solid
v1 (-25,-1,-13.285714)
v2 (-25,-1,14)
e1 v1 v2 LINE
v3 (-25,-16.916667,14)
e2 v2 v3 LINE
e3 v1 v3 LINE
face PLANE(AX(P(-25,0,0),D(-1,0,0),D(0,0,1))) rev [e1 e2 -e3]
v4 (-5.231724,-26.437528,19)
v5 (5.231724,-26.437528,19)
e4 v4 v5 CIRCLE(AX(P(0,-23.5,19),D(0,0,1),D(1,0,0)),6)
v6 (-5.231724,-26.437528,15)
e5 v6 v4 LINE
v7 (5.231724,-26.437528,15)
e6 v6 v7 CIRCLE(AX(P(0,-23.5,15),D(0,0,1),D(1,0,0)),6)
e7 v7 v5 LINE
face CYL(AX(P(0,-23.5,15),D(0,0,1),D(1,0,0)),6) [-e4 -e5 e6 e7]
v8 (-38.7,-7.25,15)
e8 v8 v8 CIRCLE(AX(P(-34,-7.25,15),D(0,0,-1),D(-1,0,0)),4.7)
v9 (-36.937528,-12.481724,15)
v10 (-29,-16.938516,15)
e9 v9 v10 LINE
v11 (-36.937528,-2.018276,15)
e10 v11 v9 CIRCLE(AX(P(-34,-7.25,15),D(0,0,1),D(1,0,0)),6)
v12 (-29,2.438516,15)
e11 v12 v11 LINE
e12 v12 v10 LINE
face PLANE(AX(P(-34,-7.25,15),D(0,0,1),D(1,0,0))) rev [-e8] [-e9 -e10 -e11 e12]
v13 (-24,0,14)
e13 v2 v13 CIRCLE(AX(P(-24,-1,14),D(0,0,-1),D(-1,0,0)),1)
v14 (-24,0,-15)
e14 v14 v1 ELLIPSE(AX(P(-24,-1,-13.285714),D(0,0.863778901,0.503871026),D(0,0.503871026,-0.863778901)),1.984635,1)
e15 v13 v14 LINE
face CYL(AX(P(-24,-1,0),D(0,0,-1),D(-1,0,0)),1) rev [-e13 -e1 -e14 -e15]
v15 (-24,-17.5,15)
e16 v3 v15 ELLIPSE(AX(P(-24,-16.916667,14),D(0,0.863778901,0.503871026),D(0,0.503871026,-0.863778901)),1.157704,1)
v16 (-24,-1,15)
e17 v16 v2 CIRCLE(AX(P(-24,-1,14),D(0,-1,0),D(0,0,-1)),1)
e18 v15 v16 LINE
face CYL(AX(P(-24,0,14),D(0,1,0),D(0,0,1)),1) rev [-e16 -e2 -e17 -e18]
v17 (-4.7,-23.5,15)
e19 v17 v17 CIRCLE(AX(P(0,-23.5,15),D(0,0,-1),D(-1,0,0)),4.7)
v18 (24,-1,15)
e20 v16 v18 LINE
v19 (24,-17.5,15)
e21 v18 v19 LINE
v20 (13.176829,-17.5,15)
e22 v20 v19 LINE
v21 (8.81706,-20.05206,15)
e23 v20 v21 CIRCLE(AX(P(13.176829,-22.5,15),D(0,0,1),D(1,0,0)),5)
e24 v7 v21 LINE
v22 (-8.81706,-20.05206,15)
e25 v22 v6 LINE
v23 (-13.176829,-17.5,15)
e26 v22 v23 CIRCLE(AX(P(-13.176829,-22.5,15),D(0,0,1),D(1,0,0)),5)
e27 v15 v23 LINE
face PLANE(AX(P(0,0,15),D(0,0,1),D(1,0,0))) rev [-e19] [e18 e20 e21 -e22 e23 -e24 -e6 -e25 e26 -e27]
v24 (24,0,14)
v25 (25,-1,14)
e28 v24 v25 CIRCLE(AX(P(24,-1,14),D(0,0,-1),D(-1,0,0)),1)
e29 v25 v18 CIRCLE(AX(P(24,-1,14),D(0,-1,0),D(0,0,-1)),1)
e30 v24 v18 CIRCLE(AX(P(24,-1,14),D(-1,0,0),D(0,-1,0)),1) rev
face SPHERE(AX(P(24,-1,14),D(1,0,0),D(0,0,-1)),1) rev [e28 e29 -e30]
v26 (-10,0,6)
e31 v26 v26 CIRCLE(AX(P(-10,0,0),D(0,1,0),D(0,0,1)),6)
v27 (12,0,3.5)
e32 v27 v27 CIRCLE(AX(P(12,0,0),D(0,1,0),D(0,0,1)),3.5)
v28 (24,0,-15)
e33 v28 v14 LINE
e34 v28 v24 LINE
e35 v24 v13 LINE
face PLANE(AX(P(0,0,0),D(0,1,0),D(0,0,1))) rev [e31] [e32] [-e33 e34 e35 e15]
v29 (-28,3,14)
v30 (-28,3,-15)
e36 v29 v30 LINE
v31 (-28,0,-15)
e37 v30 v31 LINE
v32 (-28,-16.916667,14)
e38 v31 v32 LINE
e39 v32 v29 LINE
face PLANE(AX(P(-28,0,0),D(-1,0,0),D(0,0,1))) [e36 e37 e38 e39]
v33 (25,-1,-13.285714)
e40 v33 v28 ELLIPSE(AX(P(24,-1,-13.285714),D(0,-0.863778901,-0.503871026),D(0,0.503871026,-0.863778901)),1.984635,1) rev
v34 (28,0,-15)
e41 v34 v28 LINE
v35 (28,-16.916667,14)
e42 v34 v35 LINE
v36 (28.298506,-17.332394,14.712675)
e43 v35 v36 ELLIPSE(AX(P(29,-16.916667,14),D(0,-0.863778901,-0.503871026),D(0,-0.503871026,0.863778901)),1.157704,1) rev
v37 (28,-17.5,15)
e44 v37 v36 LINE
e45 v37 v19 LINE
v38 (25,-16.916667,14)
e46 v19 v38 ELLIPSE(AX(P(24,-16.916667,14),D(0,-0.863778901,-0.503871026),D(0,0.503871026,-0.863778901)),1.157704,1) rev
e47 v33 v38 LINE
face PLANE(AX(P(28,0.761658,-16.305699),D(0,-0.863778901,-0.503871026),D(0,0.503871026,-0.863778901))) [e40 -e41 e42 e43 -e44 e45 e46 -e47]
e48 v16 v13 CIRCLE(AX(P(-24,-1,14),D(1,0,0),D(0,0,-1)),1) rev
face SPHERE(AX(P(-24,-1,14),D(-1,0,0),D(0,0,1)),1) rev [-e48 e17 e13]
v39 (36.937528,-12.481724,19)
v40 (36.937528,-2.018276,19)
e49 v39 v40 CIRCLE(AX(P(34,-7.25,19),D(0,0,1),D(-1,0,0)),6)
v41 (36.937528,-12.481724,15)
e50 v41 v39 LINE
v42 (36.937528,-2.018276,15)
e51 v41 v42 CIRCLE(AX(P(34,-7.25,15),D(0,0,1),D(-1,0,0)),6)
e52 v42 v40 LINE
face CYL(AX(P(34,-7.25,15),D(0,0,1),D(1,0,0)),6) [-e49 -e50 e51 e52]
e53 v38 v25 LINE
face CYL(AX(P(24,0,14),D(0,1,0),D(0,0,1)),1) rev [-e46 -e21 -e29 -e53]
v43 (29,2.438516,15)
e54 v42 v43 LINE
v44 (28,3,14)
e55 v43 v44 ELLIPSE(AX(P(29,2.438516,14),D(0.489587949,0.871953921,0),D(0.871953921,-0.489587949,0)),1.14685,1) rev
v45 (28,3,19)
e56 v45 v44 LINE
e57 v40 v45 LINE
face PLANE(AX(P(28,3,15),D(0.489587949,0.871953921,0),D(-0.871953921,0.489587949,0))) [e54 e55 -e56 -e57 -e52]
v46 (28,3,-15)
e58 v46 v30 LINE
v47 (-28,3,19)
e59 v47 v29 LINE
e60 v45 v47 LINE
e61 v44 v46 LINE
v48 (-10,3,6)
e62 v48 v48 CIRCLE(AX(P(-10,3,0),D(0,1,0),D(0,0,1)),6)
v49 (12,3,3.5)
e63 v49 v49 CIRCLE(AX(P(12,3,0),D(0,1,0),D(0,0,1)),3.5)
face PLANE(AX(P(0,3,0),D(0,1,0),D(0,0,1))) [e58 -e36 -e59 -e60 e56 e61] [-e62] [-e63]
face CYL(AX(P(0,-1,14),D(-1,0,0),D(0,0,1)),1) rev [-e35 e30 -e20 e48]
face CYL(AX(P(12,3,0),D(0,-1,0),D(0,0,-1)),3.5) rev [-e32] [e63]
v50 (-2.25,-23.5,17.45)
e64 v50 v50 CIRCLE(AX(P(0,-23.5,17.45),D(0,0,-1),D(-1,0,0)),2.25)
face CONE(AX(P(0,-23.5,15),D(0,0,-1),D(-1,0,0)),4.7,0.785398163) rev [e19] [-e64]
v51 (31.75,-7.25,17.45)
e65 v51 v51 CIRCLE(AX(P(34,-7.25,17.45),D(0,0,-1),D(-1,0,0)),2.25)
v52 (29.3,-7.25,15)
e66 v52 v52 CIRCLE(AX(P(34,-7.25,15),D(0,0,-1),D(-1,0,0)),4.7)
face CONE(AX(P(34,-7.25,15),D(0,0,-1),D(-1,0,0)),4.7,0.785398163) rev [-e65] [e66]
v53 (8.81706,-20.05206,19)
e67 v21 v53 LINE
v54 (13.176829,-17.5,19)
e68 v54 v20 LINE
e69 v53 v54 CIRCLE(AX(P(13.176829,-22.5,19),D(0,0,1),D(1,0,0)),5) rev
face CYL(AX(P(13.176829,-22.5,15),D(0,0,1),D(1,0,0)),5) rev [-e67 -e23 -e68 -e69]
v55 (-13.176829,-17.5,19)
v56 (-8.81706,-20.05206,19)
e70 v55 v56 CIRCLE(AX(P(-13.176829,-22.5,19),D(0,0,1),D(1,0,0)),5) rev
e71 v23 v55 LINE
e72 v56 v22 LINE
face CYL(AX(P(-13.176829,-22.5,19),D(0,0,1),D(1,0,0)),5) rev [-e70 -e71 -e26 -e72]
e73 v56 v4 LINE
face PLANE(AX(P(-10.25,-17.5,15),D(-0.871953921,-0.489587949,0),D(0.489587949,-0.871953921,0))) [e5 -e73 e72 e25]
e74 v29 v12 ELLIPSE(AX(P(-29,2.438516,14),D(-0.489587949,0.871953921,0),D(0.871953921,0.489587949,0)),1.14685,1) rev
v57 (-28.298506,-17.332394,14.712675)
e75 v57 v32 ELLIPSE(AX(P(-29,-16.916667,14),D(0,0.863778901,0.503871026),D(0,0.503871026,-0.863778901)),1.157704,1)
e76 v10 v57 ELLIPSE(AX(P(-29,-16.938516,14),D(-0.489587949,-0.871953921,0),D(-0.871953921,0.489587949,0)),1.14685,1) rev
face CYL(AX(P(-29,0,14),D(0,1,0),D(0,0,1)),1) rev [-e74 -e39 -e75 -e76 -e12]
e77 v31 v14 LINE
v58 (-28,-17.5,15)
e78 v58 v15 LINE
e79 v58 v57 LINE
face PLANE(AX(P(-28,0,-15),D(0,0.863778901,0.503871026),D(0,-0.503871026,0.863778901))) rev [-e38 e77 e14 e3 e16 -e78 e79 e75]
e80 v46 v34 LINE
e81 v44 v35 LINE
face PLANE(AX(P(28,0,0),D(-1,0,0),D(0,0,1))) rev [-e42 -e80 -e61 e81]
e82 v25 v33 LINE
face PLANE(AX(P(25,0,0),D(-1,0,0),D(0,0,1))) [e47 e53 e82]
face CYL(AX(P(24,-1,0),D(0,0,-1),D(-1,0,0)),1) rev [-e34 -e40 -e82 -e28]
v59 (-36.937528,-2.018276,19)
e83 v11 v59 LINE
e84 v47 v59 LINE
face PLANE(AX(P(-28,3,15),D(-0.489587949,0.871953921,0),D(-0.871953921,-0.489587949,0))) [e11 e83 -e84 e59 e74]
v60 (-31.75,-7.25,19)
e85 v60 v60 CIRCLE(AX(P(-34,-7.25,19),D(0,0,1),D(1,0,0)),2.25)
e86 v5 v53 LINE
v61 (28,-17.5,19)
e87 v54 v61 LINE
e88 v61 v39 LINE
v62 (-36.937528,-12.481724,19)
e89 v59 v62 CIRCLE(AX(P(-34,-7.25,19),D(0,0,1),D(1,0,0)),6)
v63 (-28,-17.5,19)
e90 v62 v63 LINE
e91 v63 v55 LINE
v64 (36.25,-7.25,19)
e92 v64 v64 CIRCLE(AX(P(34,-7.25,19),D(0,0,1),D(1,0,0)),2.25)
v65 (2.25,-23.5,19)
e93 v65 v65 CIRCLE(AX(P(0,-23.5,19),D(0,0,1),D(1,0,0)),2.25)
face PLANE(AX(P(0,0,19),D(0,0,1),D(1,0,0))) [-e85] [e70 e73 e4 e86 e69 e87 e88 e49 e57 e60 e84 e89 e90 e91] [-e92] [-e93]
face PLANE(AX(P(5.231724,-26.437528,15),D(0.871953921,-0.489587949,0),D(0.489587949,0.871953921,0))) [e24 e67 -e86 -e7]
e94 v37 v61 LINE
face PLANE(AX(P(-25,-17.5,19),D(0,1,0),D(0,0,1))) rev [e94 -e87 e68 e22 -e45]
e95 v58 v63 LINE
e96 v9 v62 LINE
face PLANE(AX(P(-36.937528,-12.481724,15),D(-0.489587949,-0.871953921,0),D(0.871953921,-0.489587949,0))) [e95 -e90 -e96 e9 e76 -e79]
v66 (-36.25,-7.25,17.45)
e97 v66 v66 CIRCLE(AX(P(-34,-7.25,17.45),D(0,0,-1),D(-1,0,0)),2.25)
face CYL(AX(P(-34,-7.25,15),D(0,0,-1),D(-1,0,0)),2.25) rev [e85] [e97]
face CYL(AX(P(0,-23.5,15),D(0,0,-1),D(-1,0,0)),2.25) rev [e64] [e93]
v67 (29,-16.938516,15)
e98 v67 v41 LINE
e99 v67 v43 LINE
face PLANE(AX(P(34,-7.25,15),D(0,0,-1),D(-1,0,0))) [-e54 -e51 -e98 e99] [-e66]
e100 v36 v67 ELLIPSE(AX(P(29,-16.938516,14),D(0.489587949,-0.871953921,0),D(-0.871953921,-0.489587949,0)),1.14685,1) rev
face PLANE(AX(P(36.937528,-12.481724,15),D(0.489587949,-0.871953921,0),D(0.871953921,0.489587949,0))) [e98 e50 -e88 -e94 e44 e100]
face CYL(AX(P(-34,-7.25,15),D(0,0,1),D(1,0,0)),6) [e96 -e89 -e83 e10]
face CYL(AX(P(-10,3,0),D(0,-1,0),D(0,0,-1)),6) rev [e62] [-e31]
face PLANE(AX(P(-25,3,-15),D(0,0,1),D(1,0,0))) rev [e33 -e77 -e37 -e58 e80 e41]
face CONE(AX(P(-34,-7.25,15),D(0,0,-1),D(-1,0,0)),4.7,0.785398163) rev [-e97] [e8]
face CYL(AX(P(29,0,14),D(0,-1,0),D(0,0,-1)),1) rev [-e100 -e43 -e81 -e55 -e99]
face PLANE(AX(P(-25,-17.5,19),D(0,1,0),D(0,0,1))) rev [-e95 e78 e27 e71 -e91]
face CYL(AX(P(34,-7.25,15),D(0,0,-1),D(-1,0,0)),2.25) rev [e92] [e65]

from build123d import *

# Parameters (mm, degrees)
SKETCH1_W                                       = 50
SKETCH1_H                                       = 30
SKETCH1_R                                       = 6
SKETCH1_R_2                                     = 3.5
BOSS_EXTRUDE1_DEPTH                             = 3
SKETCH2_W                                       = 50
SKETCH2_H                                       = 20.5
BOSS_EXTRUDE2_DEPTH                             = 4
BOSS_EXTRUDE3_DEPTH                             = 3
BOSS_EXTRUDE4_START                             = -50
BOSS_EXTRUDE4_DEPTH                             = 3
BOSS_EXTRUDE5_DEPTH                             = 4
CSK_FOR_M4_FLAT_HEAD_MACHINE_SCREW1_D           = 4.5
CSK_FOR_M4_FLAT_HEAD_MACHINE_SCREW1_DEPTH       = 10
CSK_FOR_M4_FLAT_HEAD_MACHINE_SCREW1_CSINK_D     = 9.4
CSK_FOR_M4_FLAT_HEAD_MACHINE_SCREW1_CSINK_ANGLE = 90
CSK_FOR_M4_FLAT_HEAD_MACHINE_SCREW1_TIP         = 1.351936393
FILLET1_R                                       = 5
FILLET2_R                                       = 1


with BuildPart() as part:
    # Sketch1 → Boss-Extrude1 (new body)
    with BuildSketch(Plane(origin=(0, 0, 0), x_dir=(1, 0, 0), z_dir=(0, 1, 0))):
        Rectangle(SKETCH1_W, SKETCH1_H)
        with Locations(Location((-10, 0, 0), (0, 0, 270))):
            Circle(SKETCH1_R, mode=Mode.SUBTRACT)
        with Locations(Location((12, 0, 0), (0, 0, 270))):
            Circle(SKETCH1_R_2, mode=Mode.SUBTRACT)
    extrude(amount=BOSS_EXTRUDE1_DEPTH)

    # Sketch2 → Boss-Extrude2 (add)
    with BuildSketch(Plane.XY.offset(15)):
        with Locations((0, -7.25)):
            Rectangle(SKETCH2_W, SKETCH2_H)
    extrude(amount=BOSS_EXTRUDE2_DEPTH)

    # Sketch3 → Boss-Extrude3 (add)
    with BuildSketch(Plane.ZY.offset(25)):
        Polygon((-15, 3), (-15, 0), (15, -17.5), (19, -17.5), (19, 3), align=None)
    extrude(amount=BOSS_EXTRUDE3_DEPTH)

    # Sketch3<2> → Boss-Extrude4 (add)
    with BuildSketch(Plane.ZY.offset(25).offset(BOSS_EXTRUDE4_START)):
        Polygon((-15, 3), (-15, 0), (15, -17.5), (19, -17.5), (19, 3), align=None)
    extrude(amount=-BOSS_EXTRUDE4_DEPTH)

    # Sketch5 → Boss-Extrude5 (add)
    with BuildSketch(Plane.XY.offset(19)):
        with BuildLine():
            Line((-28, 3), (-36.937527692, -2.018276473))
            ThreePointArc((-36.937527692, -2.018276473), (-40, -7.25), (-36.937527692, -12.481723527))
            Line((-36.937527692, -12.481723527), (-28, -17.5))
            Line((-28, -17.5), (-28, 3))
        make_face()
        with BuildLine():
            Line((28, 3), (36.937527692, -2.018276473))
            ThreePointArc((36.937527692, -2.018276473), (40, -7.25), (36.937527692, -12.481723527))
            Line((36.937527692, -12.481723527), (28, -17.5))
            Line((28, -17.5), (28, 3))
        make_face()
        with BuildLine():
            Line((10.25, -17.5), (-10.25, -17.5))
            Line((-10.25, -17.5), (-5.231723527, -26.437527692))
            ThreePointArc((-5.231723527, -26.437527692), (0, -29.5), (5.231723527, -26.437527692))
            Line((5.231723527, -26.437527692), (10.25, -17.5))
        make_face()
    extrude(amount=-BOSS_EXTRUDE5_DEPTH)

    # CSK for M4 Flat Head Machine Screw1
    with Locations(Plane(origin=(0, 0, 15), x_dir=(-1, 0, 0), z_dir=(0, 0, -1))):
        with Locations((-34, -7.25), (34, -7.25), (0, -23.5)):
            CounterSinkHole(CSK_FOR_M4_FLAT_HEAD_MACHINE_SCREW1_D / 2, CSK_FOR_M4_FLAT_HEAD_MACHINE_SCREW1_CSINK_D / 2, depth=CSK_FOR_M4_FLAT_HEAD_MACHINE_SCREW1_DEPTH, counter_sink_angle=CSK_FOR_M4_FLAT_HEAD_MACHINE_SCREW1_CSINK_ANGLE)
            with Locations((0, 0, -(CSK_FOR_M4_FLAT_HEAD_MACHINE_SCREW1_DEPTH + CSK_FOR_M4_FLAT_HEAD_MACHINE_SCREW1_TIP / 2))):  # 118° drill point
                Cone(0, CSK_FOR_M4_FLAT_HEAD_MACHINE_SCREW1_D / 2, CSK_FOR_M4_FLAT_HEAD_MACHINE_SCREW1_TIP, mode=Mode.SUBTRACT)

    # Fillet1
    fillet1_edges = [part.edges().sort_by_distance(p)[0] for p in [
        (-10.25, -17.5, 17),
        (10.25, -17.5, 17),
    ]]
    fillet(fillet1_edges, radius=FILLET1_R)

    # Fillet2
    # the kernel refuses this fillet: 1 mm, written as the material it adds along each edge
    with BuildSketch(Plane(origin=(-24, -1, 14), x_dir=(0, 1, 0), z_dir=(0, 0, 1))) as fillet2_piece_1_section:
        Polygon((0, 0), (FILLET2_R, 0), (FILLET2_R, FILLET2_R), (0, FILLET2_R), align=None)
    fillet2_piece_1 = extrude(amount=FILLET2_R, mode=Mode.PRIVATE)
    fillet2_piece_1 = fillet2_piece_1 - Plane(origin=(-24, -1, 14), x_dir=(0.7071067811865475, -0.7071067811865475, 0), z_dir=(0, 0, 1)) * Sphere(FILLET2_R, mode=Mode.PRIVATE)
    add(fillet2_piece_1)
    with BuildSketch(Plane(origin=(24, -1, 14), x_dir=(1, 0, 0), z_dir=(0, 0, 1))) as fillet2_piece_2_section:
        Polygon((0, 0), (FILLET2_R, 0), (FILLET2_R, FILLET2_R), (0, FILLET2_R), align=None)
    fillet2_piece_2 = extrude(amount=FILLET2_R, mode=Mode.PRIVATE)
    fillet2_piece_2 = fillet2_piece_2 - Plane(origin=(24, -1, 14), x_dir=(-0.7071067811865475, -0.7071067811865475, 0), z_dir=(0, 0, 1)) * Sphere(FILLET2_R, mode=Mode.PRIVATE)
    add(fillet2_piece_2)
    with BuildSketch(Plane(origin=(-25, -17.5, 15), x_dir=(1, 0, 0), z_dir=(0, 1, 0))) as fillet2_piece_3_section:
        with BuildLine():
            CenterArc((FILLET2_R, FILLET2_R), FILLET2_R, 180, 90)
            Line((0, FILLET2_R), (0, 0))
            Line((0, 0), (FILLET2_R, 0))
        make_face()
    fillet2_piece_3 = extrude(amount=16.5, mode=Mode.PRIVATE)
    fillet2_piece_3 = split(fillet2_piece_3, bisect_by=Plane(origin=(-24.77263385, -15.290921561, 11.213008391), z_dir=(0, 0.8637789008984336, 0.5038710255240861)), keep=Keep.TOP, mode=Mode.PRIVATE)
    add(fillet2_piece_3)
    with BuildSketch(Plane(origin=(25, -1, 15), x_dir=(-1, 0, 0), z_dir=(0, -1, 0))) as fillet2_piece_4_section:
        with BuildLine():
            CenterArc((FILLET2_R, FILLET2_R), FILLET2_R, 180, 90)
            Line((0, FILLET2_R), (0, 0))
            Line((0, 0), (FILLET2_R, 0))
        make_face()
    fillet2_piece_4 = extrude(amount=16.5, mode=Mode.PRIVATE)
    fillet2_piece_4 = split(fillet2_piece_4, bisect_by=Plane(origin=(24.77263385, -15.290921561, 11.213008391), z_dir=(0, 0.8637789008984336, 0.5038710255240861)), keep=Keep.TOP, mode=Mode.PRIVATE)
    add(fillet2_piece_4)
    with BuildSketch(Plane(origin=(24, 0, 15), x_dir=(0, -1, 0), z_dir=(-1, 0, 0))) as fillet2_piece_5:
        with BuildLine():
            CenterArc((FILLET2_R, -FILLET2_R), FILLET2_R, 90, 90)
            Line((0, -FILLET2_R), (0, 0))
            Line((0, 0), (FILLET2_R, 0))
        make_face()
    extrude(amount=48)
    with BuildSketch(Plane(origin=(-25, 0, 14), x_dir=(1, 0, 0), z_dir=(0, 0, -1))) as fillet2_piece_6_section:
        with BuildLine():
            CenterArc((FILLET2_R, FILLET2_R), FILLET2_R, 180, 90)
            Line((0, FILLET2_R), (0, 0))
            Line((0, 0), (FILLET2_R, 0))
        make_face()
    fillet2_piece_6 = extrude(amount=29, mode=Mode.PRIVATE)
    fillet2_piece_6 = split(fillet2_piece_6, bisect_by=Plane(origin=(-24.77197237, -6.451381469, -3.94048891), z_dir=(0, 0.8637789008984336, 0.5038710255240861)), keep=Keep.TOP, mode=Mode.PRIVATE)
    add(fillet2_piece_6)
    with BuildSketch(Plane(origin=(25, 0, -15), x_dir=(0, -1, 0), z_dir=(0, 0, 1))) as fillet2_piece_7_section:
        with BuildLine():
            CenterArc((FILLET2_R, -FILLET2_R), FILLET2_R, 90, 90)
            Line((0, -FILLET2_R), (0, 0))
            Line((0, 0), (FILLET2_R, 0))
        make_face()
    fillet2_piece_7 = extrude(amount=29, mode=Mode.PRIVATE)
    fillet2_piece_7 = split(fillet2_piece_7, bisect_by=Plane(origin=(24.77197237, -6.451381469, -3.94048891), z_dir=(0, 0.8637789008984336, 0.5038710255240861)), keep=Keep.TOP, mode=Mode.PRIVATE)
    add(fillet2_piece_7)
    with BuildSketch(Plane(origin=(-28, -20, 15), x_dir=(0, 0, -1), z_dir=(0, 1, 0))) as fillet2_piece_8_section:
        with BuildLine():
            CenterArc((FILLET2_R, FILLET2_R), FILLET2_R, 180, 90)
            Line((0, FILLET2_R), (0, 0))
            Line((0, 0), (FILLET2_R, 0))
        make_face()
    fillet2_piece_8 = extrude(amount=23, mode=Mode.PRIVATE)
    fillet2_piece_8 = split(fillet2_piece_8, bisect_by=Plane(origin=(-28.224621948, -14.787732132, 10.350397941), z_dir=(0, 0.8637789008984336, 0.5038710255240861)), keep=Keep.TOP, mode=Mode.PRIVATE)
    fillet2_piece_8 = split(fillet2_piece_8, bisect_by=Plane(origin=(-32.565520465, -14.936534495, 14.773416923), z_dir=(0.48958794860434196, 0.8719539211342491, 0)), keep=Keep.TOP, mode=Mode.PRIVATE)
    fillet2_piece_8 = split(fillet2_piece_8, bisect_by=Plane(origin=(-32.527453001, 0.457908757, 14.773416923), z_dir=(0.48958794860434235, -0.8719539211342491, 0)), keep=Keep.TOP, mode=Mode.PRIVATE)
    add(fillet2_piece_8)
    with BuildSketch(Plane(origin=(28, -20, 15), x_dir=(1, 0, 0), z_dir=(0, 1, 0))) as fillet2_piece_9_section:
        with BuildLine():
            CenterArc((FILLET2_R, FILLET2_R), FILLET2_R, 180, 90)
            Line((0, FILLET2_R), (0, 0))
            Line((0, 0), (FILLET2_R, 0))
        make_face()
    fillet2_piece_9 = extrude(amount=23, mode=Mode.PRIVATE)
    fillet2_piece_9 = split(fillet2_piece_9, bisect_by=Plane(origin=(32.565520464, -14.936534495, 14.773416923), z_dir=(-0.48958794860434196, 0.8719539211342491, 0)), keep=Keep.TOP, mode=Mode.PRIVATE)
    fillet2_piece_9 = split(fillet2_piece_9, bisect_by=Plane(origin=(28.224621948, -14.787732132, 10.350397941), z_dir=(0, 0.8637789008984336, 0.5038710255240861)), keep=Keep.TOP, mode=Mode.PRIVATE)
    fillet2_piece_9 = split(fillet2_piece_9, bisect_by=Plane(origin=(32.527453001, 0.457908757, 14.773416923), z_dir=(-0.48958794860434235, -0.8719539211342491, 0)), keep=Keep.TOP, mode=Mode.PRIVATE)
    add(fillet2_piece_9)


solid = part.part
